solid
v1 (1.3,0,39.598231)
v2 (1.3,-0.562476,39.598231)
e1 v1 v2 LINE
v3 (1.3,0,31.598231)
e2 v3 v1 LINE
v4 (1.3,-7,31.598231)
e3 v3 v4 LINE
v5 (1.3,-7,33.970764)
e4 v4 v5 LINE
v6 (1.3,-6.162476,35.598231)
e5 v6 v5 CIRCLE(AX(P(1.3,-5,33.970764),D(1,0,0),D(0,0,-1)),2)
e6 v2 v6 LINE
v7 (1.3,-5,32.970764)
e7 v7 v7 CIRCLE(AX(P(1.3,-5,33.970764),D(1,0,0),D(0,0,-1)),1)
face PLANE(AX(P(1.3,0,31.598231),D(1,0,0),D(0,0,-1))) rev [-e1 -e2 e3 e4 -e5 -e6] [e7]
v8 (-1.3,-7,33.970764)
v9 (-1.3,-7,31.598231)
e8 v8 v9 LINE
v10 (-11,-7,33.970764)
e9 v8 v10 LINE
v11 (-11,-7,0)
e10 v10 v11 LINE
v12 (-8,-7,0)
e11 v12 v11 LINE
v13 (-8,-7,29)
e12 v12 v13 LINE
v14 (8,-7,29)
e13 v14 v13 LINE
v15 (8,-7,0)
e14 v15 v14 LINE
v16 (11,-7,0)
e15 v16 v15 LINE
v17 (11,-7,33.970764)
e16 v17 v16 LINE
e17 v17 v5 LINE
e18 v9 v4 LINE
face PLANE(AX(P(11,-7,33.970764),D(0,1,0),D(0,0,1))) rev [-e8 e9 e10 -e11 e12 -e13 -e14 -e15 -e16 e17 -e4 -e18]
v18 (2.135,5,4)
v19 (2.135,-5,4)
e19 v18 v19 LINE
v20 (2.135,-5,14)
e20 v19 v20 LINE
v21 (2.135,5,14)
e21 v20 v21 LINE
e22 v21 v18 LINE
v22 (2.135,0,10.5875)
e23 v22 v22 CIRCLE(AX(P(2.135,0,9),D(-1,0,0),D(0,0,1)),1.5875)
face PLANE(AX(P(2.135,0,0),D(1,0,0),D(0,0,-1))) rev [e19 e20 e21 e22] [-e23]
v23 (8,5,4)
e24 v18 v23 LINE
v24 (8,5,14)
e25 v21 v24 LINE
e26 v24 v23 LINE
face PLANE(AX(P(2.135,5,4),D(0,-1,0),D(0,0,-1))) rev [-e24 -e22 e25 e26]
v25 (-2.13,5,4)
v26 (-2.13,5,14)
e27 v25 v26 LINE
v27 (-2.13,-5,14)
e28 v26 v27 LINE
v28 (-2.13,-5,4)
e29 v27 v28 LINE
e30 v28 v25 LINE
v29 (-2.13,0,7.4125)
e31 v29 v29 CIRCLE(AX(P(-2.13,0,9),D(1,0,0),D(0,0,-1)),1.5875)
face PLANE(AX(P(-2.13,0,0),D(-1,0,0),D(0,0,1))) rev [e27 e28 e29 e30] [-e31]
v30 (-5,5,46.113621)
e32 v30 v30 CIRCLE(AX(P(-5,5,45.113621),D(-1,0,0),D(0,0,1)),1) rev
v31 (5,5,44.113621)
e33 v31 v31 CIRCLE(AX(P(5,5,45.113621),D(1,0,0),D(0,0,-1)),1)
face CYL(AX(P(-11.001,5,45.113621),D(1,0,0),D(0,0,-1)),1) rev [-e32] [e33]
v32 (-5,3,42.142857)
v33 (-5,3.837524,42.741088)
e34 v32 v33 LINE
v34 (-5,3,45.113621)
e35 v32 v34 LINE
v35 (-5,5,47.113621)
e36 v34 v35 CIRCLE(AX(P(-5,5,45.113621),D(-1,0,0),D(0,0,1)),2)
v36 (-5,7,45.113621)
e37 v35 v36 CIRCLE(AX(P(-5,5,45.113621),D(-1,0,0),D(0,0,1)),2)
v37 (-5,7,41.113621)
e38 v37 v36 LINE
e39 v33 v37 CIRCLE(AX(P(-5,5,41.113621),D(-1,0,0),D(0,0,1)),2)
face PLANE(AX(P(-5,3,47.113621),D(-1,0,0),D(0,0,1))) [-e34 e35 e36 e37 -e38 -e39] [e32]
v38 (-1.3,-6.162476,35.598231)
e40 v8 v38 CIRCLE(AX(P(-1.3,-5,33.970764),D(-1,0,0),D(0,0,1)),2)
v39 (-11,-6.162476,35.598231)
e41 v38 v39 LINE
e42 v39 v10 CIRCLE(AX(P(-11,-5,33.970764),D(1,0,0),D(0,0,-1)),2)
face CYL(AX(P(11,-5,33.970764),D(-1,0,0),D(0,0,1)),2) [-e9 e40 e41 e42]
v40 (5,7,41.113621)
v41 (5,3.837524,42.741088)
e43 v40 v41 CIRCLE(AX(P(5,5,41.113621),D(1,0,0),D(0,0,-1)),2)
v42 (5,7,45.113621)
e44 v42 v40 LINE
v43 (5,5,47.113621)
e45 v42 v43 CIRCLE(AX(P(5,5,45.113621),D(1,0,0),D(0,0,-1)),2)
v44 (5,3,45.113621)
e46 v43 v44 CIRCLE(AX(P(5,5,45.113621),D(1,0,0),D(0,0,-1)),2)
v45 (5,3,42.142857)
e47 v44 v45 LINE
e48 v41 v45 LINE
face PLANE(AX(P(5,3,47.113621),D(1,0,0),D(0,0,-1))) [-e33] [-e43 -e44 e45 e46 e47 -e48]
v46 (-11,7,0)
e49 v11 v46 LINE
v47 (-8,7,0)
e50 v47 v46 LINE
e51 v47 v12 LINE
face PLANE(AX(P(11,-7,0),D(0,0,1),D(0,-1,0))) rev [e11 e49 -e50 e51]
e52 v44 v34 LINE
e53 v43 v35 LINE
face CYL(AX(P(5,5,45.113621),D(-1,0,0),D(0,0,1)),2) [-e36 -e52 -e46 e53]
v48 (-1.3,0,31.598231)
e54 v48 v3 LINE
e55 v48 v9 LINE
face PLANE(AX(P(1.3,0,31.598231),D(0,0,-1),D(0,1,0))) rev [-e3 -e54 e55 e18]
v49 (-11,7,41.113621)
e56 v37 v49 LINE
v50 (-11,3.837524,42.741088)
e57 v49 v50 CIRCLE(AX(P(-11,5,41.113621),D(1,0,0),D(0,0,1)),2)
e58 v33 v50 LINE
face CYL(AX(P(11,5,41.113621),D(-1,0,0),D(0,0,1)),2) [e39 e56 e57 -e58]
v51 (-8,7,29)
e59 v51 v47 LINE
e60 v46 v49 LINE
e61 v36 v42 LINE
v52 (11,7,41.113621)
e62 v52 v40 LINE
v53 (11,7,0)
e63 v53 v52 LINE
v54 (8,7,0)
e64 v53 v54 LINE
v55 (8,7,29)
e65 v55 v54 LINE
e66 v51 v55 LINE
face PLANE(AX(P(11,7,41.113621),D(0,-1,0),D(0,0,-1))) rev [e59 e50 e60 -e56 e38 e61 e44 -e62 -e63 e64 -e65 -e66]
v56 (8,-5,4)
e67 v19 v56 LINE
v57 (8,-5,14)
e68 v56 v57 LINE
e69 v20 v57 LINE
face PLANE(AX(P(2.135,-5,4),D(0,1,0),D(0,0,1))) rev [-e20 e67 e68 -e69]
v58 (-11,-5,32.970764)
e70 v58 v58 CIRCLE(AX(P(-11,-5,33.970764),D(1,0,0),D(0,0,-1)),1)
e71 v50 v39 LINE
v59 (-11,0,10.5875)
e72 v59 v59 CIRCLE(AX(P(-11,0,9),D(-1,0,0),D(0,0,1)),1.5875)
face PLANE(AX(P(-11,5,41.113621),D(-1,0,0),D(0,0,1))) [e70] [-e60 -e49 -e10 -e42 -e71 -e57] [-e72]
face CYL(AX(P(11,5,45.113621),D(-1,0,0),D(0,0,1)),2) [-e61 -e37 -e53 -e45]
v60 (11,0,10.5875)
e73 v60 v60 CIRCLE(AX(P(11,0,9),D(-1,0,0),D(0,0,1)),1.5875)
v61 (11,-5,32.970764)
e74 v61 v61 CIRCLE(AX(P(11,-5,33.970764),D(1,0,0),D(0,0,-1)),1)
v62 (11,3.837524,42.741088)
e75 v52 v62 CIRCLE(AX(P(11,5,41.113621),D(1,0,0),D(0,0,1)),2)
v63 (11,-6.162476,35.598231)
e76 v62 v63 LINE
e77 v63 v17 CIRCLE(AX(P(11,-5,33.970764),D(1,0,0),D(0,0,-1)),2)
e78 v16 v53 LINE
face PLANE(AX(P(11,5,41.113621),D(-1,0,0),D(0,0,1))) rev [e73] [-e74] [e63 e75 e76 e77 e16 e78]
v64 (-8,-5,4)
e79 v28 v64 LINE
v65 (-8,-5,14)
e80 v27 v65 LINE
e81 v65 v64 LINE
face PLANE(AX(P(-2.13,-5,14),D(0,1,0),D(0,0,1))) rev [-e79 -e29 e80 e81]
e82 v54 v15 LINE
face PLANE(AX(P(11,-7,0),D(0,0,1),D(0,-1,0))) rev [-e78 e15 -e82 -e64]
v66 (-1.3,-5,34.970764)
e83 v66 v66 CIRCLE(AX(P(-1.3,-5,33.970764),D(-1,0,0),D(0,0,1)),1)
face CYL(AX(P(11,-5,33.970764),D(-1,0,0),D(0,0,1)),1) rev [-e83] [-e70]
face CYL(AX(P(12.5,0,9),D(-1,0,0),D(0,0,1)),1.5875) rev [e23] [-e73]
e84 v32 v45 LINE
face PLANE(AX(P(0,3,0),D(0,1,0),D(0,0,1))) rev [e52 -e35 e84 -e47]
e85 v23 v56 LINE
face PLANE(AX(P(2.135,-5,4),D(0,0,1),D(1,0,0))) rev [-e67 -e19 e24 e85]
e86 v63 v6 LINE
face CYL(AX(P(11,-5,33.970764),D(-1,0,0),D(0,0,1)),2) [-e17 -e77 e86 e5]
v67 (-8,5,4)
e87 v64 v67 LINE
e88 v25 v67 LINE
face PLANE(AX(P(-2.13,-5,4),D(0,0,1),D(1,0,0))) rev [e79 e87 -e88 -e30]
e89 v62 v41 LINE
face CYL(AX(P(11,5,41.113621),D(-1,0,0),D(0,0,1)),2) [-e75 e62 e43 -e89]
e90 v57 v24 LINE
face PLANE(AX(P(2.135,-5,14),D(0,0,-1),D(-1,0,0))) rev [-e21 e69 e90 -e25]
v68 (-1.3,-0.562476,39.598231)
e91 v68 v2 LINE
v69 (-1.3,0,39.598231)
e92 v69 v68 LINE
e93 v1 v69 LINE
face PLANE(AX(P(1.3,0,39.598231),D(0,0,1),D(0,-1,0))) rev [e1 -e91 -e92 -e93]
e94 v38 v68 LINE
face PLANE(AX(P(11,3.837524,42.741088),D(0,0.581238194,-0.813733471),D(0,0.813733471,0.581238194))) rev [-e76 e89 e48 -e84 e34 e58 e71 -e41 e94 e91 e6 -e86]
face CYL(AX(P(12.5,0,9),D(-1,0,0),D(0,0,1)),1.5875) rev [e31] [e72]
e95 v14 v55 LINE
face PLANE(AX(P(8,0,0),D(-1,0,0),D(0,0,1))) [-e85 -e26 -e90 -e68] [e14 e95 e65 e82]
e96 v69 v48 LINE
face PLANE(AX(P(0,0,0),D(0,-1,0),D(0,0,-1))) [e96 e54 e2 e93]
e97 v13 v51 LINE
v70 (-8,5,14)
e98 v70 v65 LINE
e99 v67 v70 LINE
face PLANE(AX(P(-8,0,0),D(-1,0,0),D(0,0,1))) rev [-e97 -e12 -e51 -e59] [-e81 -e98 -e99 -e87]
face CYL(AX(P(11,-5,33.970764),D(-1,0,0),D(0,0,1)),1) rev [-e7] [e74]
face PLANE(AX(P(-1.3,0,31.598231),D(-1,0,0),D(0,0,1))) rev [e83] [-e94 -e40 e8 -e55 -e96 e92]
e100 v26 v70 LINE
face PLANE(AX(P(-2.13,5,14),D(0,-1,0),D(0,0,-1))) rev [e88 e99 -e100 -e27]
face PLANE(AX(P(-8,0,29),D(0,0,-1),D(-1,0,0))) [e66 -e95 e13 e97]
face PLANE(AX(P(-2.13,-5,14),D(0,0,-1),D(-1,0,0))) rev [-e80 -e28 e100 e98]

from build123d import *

# Parameters (mm, degrees)
SKETCH1_R              = 1
BOSS_EXTRUDE1_DEPTH    = 11
SKETCH2_W              = 10
SKETCH2_H              = 6
BOSS_EXTRUDE2_DEPTH    = 4
CUT_EXTRUDE1_REACH     = 52.246
SKETCH3_R              = 1
FILLET1_R              = 2
SKETCH4_W              = 2.6
SKETCH4_H              = 8
CUT_EXTRUDE3_DEPTH     = 7
CUT_EXTRUDE4_START     = -8
CUT_EXTRUDE4_OUTLINE_W = 29
CUT_EXTRUDE4_OUTLINE_H = 14
CUT_EXTRUDE4_DEPTH     = 16
SKETCH5_3_R            = 1.5875
CUT_EXTRUDE5_DEPTH     = 12.5
SKETCH7_W              = 10
SKETCH7_H              = 10
SKETCH7_R              = 1.5875
BOSS_EXTRUDE3_DEPTH    = 5.87
BOSS_EXTRUDE4_START    = 5.865
SKETCH9_W              = 10
SKETCH9_H              = 10
SKETCH9_R              = 1.5875
BOSS_EXTRUDE4_DEPTH    = 5.865


# Read off the part's stored shape, not the designer's step: Cut-Extrude4
with BuildPart() as part:
    # Sketch1 → Boss-Extrude1 (new, symmetric)
    with BuildSketch(Plane(origin=(0, 0, 0), x_dir=(0, 0, -1), z_dir=(1, 0, 0))):
        with BuildLine():
            Line((-42.741088295, 3.837523613), (-35.598231152, -6.162476387))
            ThreePointArc((-35.598231152, -6.162476387), (-34.885927371, -6.778335285), (-33.970764209, -7))
            Line((-33.970764209, -7), (0, -7))
            Line((0, -7), (0, 7))
            Line((0, 7), (-41.113621352, 7))
            ThreePointArc((-41.113621352, 7), (-42.891956638, 5.915163162), (-42.741088295, 3.837523613))
        make_face()
        with Locations((-33.970764209, -5)):
            Circle(SKETCH1_R, mode=Mode.SUBTRACT)
    extrude(amount=BOSS_EXTRUDE1_DEPTH, both=True)

    # Sketch2 → Boss-Extrude2 (add)
    with BuildSketch(Plane(origin=(0, 7, 0), x_dir=(1, 0, 0), z_dir=(0, 1, 0))):
        with Locations((0, -44.113621352)):
            Rectangle(SKETCH2_W, SKETCH2_H)
    extrude(amount=-BOSS_EXTRUDE2_DEPTH)

    # Sketch3 → Cut-Extrude1 (cut, up to next)
    with BuildSketch(Plane(origin=(5, 0, 0), x_dir=(0, 0, -1), z_dir=(1, 0, 0)), mode=Mode.PRIVATE) as cut_extrude1_sk1:
        with Locations((-45.113621352, 5)):
            Circle(SKETCH3_R)
    cut_extrude1_tool1 = extrude(cut_extrude1_sk1.sketch, amount=-CUT_EXTRUDE1_REACH, mode=Mode.PRIVATE) & part.part
    add(cut_extrude1_tool1.solids().sort_by_distance((5, 5, 45.113621))[0], mode=Mode.SUBTRACT)

    # Fillet1
    fillet1_edges = [part.edges().sort_by_distance(p)[0] for p in [
        (0, 3, 47.113621352),
        (0, 7, 47.113621352),
    ]]
    fillet(fillet1_edges, radius=FILLET1_R - 0.0001)  # a hair under: the kernel refuses the full size

    # Sketch4 → Cut-Extrude3 (cut)
    with BuildSketch(Plane.XZ.offset(7)):
        with Locations((0, 35.598231152)):
            Rectangle(SKETCH4_W, SKETCH4_H)
    extrude(amount=-CUT_EXTRUDE3_DEPTH, mode=Mode.SUBTRACT)

    # Cut-Extrude4 outline → Cut-Extrude4 (cut)
    with BuildSketch(Plane.ZY.offset(CUT_EXTRUDE4_START)):
        with Locations((14.5, 0)):
            Rectangle(CUT_EXTRUDE4_OUTLINE_W, CUT_EXTRUDE4_OUTLINE_H)
    extrude(amount=CUT_EXTRUDE4_DEPTH, mode=Mode.SUBTRACT)

    # Sketch5<3> → Cut-Extrude5 (cut, symmetric)
    with BuildSketch(Plane.ZY):
        with Locations((9, 0)):
            Circle(SKETCH5_3_R)
    extrude(amount=CUT_EXTRUDE5_DEPTH, both=True, mode=Mode.SUBTRACT)

    # Sketch7 → Boss-Extrude3 (add)
    with BuildSketch(Plane(origin=(-8, 0, 0), x_dir=(0, 0, -1), z_dir=(1, 0, 0))):
        with Locations((-9, 0)):
            Rectangle(SKETCH7_W, SKETCH7_H)
        with Locations(Location((-9, 0, 0), (0, 0, 180))):
            Circle(SKETCH7_R, mode=Mode.SUBTRACT)
    extrude(amount=BOSS_EXTRUDE3_DEPTH)

    # Sketch9 → Boss-Extrude4 (add)
    with BuildSketch(Plane.ZY.offset(-8).offset(BOSS_EXTRUDE4_START)):
        with Locations((9, 0)):
            Rectangle(SKETCH9_W, SKETCH9_H)
        with Locations((9, 0)):
            Circle(SKETCH9_R, mode=Mode.SUBTRACT)
    extrude(amount=-BOSS_EXTRUDE4_DEPTH)


solid = part.part
